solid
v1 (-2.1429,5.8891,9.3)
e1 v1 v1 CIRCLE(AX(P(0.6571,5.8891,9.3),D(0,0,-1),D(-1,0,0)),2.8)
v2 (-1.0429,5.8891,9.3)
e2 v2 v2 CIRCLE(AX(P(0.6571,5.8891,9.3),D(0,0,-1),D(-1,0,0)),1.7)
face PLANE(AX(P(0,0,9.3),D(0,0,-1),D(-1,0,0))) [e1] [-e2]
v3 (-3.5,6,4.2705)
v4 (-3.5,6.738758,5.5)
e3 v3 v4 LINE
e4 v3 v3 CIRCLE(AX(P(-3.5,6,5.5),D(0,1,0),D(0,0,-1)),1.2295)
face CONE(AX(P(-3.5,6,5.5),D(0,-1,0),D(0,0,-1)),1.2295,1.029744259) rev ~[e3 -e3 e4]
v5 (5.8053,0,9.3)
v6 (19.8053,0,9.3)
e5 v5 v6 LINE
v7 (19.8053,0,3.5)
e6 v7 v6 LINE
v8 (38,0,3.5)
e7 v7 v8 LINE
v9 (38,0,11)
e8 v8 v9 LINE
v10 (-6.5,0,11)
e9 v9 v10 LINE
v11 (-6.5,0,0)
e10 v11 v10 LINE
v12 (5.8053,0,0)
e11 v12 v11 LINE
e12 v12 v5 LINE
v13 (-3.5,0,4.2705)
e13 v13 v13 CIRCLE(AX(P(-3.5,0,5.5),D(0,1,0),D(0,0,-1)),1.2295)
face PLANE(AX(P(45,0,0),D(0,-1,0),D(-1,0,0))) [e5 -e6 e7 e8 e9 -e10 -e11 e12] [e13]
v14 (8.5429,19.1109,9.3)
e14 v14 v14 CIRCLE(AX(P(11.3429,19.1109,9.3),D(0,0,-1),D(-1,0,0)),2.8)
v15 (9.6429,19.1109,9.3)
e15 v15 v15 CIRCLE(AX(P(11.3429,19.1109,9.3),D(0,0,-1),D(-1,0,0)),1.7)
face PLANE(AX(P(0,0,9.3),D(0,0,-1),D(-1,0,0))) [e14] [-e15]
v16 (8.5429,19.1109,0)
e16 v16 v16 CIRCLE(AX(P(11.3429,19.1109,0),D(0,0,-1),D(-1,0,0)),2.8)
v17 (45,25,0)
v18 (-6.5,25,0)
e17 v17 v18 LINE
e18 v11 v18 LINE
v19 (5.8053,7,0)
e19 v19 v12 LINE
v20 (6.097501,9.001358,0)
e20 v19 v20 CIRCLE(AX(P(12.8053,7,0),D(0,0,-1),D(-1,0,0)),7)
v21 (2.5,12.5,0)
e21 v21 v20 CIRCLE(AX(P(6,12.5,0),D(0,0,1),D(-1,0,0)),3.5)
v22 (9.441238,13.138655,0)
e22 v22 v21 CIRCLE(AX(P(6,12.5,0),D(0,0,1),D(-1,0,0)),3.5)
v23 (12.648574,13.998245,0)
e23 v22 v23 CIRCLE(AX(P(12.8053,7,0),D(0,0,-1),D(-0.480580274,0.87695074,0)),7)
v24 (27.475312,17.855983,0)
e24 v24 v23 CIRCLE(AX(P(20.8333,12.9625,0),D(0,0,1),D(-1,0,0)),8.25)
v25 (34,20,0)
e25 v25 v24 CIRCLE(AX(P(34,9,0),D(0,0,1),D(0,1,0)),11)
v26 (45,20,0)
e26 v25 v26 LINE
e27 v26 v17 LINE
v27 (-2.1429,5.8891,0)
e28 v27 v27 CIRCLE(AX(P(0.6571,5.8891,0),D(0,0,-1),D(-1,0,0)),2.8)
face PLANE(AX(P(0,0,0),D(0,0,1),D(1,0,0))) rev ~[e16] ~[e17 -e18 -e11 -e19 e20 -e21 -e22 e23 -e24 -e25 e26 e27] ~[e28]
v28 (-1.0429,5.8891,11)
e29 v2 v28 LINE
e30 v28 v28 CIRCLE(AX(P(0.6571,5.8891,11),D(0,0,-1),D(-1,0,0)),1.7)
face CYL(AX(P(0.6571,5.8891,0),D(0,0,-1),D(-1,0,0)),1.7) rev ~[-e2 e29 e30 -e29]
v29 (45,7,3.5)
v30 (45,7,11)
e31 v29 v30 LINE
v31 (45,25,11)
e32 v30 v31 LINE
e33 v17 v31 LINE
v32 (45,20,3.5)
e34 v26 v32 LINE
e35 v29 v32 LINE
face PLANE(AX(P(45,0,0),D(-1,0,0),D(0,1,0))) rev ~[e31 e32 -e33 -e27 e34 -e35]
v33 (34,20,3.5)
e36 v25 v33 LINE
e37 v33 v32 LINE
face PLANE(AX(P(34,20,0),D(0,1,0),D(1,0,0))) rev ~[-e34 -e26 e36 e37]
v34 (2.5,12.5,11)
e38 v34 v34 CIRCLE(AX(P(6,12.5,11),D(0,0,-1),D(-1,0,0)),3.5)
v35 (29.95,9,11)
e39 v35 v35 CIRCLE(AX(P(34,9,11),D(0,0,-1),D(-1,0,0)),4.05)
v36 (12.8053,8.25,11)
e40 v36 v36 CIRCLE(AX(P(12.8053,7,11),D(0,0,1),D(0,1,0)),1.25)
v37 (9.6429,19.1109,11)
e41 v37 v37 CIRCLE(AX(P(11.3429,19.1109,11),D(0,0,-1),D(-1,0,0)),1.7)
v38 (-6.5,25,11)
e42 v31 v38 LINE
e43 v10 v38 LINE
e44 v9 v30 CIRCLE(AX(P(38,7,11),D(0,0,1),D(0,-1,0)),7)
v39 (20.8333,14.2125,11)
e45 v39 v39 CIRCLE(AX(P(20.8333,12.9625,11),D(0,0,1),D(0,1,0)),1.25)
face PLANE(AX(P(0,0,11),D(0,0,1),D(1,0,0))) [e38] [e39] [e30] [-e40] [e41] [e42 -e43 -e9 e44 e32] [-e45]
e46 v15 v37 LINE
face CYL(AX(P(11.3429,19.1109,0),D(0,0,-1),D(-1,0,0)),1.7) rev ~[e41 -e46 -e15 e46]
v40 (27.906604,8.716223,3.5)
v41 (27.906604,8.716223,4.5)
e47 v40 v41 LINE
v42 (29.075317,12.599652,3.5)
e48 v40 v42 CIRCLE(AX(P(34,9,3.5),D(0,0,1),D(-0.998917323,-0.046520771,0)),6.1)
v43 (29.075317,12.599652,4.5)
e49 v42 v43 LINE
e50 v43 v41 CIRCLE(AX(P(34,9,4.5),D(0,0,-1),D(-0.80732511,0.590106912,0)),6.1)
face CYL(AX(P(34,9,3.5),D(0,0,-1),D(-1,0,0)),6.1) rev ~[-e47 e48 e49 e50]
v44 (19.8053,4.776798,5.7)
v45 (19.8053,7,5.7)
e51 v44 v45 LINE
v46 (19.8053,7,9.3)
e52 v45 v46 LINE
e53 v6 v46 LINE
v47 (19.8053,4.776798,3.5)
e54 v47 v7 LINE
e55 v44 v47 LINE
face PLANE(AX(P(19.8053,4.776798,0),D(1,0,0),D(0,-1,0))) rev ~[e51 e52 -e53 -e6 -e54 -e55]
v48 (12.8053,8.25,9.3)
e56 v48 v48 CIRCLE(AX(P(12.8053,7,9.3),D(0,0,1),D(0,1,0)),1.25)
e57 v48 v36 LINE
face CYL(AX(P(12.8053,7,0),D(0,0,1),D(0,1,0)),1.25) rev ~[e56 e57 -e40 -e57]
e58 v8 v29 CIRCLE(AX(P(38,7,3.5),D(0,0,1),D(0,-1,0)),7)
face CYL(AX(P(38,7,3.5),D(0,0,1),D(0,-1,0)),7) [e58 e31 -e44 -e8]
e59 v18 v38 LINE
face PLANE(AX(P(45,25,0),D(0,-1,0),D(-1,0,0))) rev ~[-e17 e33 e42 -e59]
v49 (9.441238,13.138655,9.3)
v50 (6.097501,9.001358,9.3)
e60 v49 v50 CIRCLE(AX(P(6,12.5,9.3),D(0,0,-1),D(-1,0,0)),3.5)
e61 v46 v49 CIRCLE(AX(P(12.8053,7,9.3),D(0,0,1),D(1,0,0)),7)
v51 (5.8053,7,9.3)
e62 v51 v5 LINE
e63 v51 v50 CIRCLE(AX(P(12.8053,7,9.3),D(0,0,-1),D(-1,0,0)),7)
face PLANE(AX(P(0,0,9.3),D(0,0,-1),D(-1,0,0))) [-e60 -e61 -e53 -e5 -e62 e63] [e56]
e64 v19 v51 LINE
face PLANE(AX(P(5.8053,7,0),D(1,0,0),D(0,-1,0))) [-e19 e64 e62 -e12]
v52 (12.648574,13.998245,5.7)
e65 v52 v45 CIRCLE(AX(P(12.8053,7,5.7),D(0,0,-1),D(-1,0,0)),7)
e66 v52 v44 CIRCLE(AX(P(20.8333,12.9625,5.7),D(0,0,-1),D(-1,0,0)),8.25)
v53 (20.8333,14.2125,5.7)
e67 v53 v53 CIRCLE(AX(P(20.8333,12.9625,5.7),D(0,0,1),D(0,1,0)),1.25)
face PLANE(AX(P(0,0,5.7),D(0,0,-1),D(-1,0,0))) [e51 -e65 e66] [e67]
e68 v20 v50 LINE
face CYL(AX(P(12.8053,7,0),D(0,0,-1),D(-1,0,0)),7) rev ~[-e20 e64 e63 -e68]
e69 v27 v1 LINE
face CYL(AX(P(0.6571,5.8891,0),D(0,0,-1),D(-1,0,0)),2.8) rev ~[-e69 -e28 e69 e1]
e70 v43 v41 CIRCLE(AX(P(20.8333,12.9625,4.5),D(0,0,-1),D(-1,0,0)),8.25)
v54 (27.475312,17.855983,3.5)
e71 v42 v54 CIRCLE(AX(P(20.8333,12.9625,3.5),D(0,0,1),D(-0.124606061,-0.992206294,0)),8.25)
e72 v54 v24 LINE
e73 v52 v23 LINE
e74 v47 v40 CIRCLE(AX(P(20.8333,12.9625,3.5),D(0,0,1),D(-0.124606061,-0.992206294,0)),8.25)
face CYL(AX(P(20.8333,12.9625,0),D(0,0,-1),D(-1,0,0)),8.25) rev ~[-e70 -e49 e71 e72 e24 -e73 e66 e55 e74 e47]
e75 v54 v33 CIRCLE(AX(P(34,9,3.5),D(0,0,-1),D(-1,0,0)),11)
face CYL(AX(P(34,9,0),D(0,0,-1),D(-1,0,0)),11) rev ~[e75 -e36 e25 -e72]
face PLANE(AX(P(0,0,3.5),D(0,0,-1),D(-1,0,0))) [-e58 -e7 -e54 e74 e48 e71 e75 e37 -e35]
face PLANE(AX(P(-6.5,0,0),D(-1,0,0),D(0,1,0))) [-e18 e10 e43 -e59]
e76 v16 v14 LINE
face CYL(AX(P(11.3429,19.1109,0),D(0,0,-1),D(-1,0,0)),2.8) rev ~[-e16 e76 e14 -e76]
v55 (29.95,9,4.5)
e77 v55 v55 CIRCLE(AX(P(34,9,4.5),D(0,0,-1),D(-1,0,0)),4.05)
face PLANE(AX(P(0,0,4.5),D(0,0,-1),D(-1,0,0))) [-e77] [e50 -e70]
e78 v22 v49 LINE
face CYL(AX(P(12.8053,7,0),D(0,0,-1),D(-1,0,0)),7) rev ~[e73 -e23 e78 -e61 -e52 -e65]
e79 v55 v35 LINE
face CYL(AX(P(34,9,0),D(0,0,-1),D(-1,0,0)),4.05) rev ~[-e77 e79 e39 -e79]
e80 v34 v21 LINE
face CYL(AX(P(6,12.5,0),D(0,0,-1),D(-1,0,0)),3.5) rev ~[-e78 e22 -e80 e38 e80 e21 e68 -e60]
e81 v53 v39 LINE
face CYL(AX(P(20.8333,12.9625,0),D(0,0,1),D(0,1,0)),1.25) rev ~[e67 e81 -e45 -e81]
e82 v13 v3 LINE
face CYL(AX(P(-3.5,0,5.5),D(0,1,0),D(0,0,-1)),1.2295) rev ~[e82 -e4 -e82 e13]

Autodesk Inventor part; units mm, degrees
ref_plane "YZ Plane" through (0, 0, 0) normal (1, 0, 0) x (0, 1, 0)
ref_plane "XZ Plane" through (0, 0, 0) normal (0, 1, 0) x (-1, 0, 0)
ref_plane "XY Plane" through (0, 0, 0) normal (0, 0, 1) x (1, 0, 0)
sketch "Sketch1" plane through (0, 0, 0) normal (0, 0, 1) x (1, 0, 0)
  line L0 (45, 0) -> (-6.5, 0) projected
  line L1 (-6.5, 0) -> (-6.5, 25) projected
  line L2 (45, 25) -> (-6.5, 25) projected
  line L3 (45, 0) -> (45, 25) projected
  circle A0 centre (12.8053, 7) radius 1.25 projected
  circle A1 centre (20.8333, 12.9625) radius 1.25 projected
  circle A2 centre (34, 9) radius 3 projected
extrude "Bryla" add sketch "Sketch1" along normal blind 11 contours L0 L1 L2 L3 | A0 | A1 | A2
sketch "Sketch3" plane through (0, 0, 0) normal (0, 0, -1) x (-1, 0, 0)
  circle A0 centre (-6, 12.5) radius 3.5
  circle A1 centre (-12.8053, 7) radius 7
  circle A2 centre (-20.8333, 12.9625) radius 8.25
  circle A3 centre (-34, 9) radius 11
  circle A4 centre (-34, 9) radius 4.05
  circle A5 centre (-34, 9) radius 6.1
  line L0 (-6, 12.5) -> (-12.8053, 7) construction
  line L1 (-12.8053, 7) -> (-20.8333, 12.9625) construction
  line L2 (-20.8333, 12.9625) -> (-34, 9) construction
  line L3 (-11.3429, 19.1109) -> (-0.6571, 5.8891) construction
  circle A6 centre (-0.6571, 5.8891) radius 1.7
  circle A7 centre (-11.3429, 19.1109) radius 1.7
  circle A8 centre (-11.3429, 19.1109) radius 2.8
  circle A9 centre (-0.6571, 5.8891) radius 2.8
  line L4 (6.5, 25) -> (6.5, 0) construction
  line L5 (6.5, 0) -> (-45, 0) construction
  line L6 (-45, 0) -> (-45, 25) construction
  line L7 (-34, 20) -> (-45, 20)
  line L8 (-45, 20) -> (-45, 0)
  line L9 (6.5, 0) -> (-45, 0) projected
  line L10 (-40.3246, 0) -> (-45, 0)
  line L11 (-27.6754, 0) -> (-23, 0)
  line L12 (-23, 0) -> (-23, 9)
  line L13 (-19.8053, 7) -> (-19.8053, 0)
  line L14 (-5.8053, 7) -> (-5.8053, 0)
  line L15 (-23, 0) -> (-19.8053, 0)
  line L16 (-29.0833, 12.9625) -> (-29.0833, 0)
  line L17 (-29.0833, 0) -> (-27.6754, 0)
  point P0 (-27.9066, 8.7162)
  point P1 (-29.0753, 12.5997)
  point P2 (-19.4597, 4.8276)
  point P3 (-22.8938, 18.8508)
  point P4 (-23.6713, 5.216)
  point P5 (-25.7685, 19.5736)
  point P6 (-12.819, 14.9204)
  point P7 (-27.4753, 17.856)
  point P8 (-20.5208, 12.676)
  point P9 (-12.6486, 13.9982)
  point P10 (-18.4098, 11.1941)
  point P11 (-8.5508, 12.5587)
  point P12 (-1.1315, 7.6691)
  point P13 (-9.5, 12.5)
  point P14 (-2.6315, 11.5495)
  point P15 (-9.4412, 13.1386)
  point P16 (-6.1553, 9.4162)
  point P17 (-8.5736, 18.697)
  point P18 (-9.3, 21.0258)
  point P19 (-6.0975, 9.0014)
  point P20 (-27.6754, 0)
  point P21 (-12.8053, 0)
  point P22 (-19.8053, 4.7768)
  point P23 (-23, 5.0021)
  dimension "d20" = 7
  dimension "d21" = 14
  dimension "d22" = 16.5
  dimension "d23" = 22
  dimension "d24" = 12.2
  dimension "d25" = 8.1
  dimension "d26" = 8.75
  dimension "d27" = 10
  dimension "d28" = 13.75
  dimension "d59" = 5.6
  dimension "d60" = 3.4
  dimension "d61" = 17
  dimension "d65" = 12.5
  dimension "d66" = 12.5
  dimension "d68" = 11
  dimension "d69" = 9
extrude "Przelot" cut sketch "Sketch3" against normal through all contours A0 A1 | A1 A0 | A4 | A6 | A7
extrude "kolo3" cut sketch "Sketch3" against normal blind 3.5 contours A1 A0 | A3 A2 A5 | A2 L16 A5 L9 A3 | L13 L9 L12 A2 | A2 A5 L16 | L12 A2 A3 | A3 L8 L7 | L12 L9 A3 A2 | A5 A2 | A2 A5 L16 | L16 A5 | A3 L9 L16 A5 A2 | A3 L9 L8 | A3 L9 | A4 picked at (-7.468, 10.5481)
extrude "kolo1" cut sketch "Sketch3" against normal blind 9.3 contours A0 A1 | A1 A0 | A0 A1 A2 | A2 A1 | L14 L9 A1 | A1 A2 L13 | L9 L13 A2 A1
extrude "kolo2" cut sketch "Sketch3" against normal blind 5.7 contours A2 A1 | A1 L13 A2 L12 A3 | A1 A2 L13 | A3 A2 A5 | L12 A2 A3 | A5 A2
hole "osieMale" at (20.8333, 12.9625, 0) at (12.8053, 7, 0) direction (0, 0, 1) diameter 2.5 end through all
extrude "kolnierzLozyska" cut sketch "Sketch3" against normal blind 1 from surface at -3.5 contours A2 A5 L16 | L16 A5 picked at (-28.8319, 8.8586)
extrude "lbySrob" cut sketch "Sketch3" against normal up to surface (9.3 mm away) contours A6 | A7 | A8 | A9
sketch "Sketch5" plane through (-6.5, 0, 11) normal (0, -1, 0) x (1, 0, 0)
  line L0 (0, -11) -> (0, 0) construction
  point P0 (6.5, -11)
  point P1 (3, -5.5)
  point P2 (0, -5.5)
  dimension "d71" = 3
hole "Hole3" at (-3.5, 0, 5.5) direction (0, 1, 0) diameter 2.459 depth 6 tip angle 118 thread size "M3x0.5" class "6H" standard "ISO Metric profile"
fillet "Fillet1" radius 7 1 edges at (45, 0, 7.25)
properties part number "MocowaniePrzekladni_CPY_3DPrint"
